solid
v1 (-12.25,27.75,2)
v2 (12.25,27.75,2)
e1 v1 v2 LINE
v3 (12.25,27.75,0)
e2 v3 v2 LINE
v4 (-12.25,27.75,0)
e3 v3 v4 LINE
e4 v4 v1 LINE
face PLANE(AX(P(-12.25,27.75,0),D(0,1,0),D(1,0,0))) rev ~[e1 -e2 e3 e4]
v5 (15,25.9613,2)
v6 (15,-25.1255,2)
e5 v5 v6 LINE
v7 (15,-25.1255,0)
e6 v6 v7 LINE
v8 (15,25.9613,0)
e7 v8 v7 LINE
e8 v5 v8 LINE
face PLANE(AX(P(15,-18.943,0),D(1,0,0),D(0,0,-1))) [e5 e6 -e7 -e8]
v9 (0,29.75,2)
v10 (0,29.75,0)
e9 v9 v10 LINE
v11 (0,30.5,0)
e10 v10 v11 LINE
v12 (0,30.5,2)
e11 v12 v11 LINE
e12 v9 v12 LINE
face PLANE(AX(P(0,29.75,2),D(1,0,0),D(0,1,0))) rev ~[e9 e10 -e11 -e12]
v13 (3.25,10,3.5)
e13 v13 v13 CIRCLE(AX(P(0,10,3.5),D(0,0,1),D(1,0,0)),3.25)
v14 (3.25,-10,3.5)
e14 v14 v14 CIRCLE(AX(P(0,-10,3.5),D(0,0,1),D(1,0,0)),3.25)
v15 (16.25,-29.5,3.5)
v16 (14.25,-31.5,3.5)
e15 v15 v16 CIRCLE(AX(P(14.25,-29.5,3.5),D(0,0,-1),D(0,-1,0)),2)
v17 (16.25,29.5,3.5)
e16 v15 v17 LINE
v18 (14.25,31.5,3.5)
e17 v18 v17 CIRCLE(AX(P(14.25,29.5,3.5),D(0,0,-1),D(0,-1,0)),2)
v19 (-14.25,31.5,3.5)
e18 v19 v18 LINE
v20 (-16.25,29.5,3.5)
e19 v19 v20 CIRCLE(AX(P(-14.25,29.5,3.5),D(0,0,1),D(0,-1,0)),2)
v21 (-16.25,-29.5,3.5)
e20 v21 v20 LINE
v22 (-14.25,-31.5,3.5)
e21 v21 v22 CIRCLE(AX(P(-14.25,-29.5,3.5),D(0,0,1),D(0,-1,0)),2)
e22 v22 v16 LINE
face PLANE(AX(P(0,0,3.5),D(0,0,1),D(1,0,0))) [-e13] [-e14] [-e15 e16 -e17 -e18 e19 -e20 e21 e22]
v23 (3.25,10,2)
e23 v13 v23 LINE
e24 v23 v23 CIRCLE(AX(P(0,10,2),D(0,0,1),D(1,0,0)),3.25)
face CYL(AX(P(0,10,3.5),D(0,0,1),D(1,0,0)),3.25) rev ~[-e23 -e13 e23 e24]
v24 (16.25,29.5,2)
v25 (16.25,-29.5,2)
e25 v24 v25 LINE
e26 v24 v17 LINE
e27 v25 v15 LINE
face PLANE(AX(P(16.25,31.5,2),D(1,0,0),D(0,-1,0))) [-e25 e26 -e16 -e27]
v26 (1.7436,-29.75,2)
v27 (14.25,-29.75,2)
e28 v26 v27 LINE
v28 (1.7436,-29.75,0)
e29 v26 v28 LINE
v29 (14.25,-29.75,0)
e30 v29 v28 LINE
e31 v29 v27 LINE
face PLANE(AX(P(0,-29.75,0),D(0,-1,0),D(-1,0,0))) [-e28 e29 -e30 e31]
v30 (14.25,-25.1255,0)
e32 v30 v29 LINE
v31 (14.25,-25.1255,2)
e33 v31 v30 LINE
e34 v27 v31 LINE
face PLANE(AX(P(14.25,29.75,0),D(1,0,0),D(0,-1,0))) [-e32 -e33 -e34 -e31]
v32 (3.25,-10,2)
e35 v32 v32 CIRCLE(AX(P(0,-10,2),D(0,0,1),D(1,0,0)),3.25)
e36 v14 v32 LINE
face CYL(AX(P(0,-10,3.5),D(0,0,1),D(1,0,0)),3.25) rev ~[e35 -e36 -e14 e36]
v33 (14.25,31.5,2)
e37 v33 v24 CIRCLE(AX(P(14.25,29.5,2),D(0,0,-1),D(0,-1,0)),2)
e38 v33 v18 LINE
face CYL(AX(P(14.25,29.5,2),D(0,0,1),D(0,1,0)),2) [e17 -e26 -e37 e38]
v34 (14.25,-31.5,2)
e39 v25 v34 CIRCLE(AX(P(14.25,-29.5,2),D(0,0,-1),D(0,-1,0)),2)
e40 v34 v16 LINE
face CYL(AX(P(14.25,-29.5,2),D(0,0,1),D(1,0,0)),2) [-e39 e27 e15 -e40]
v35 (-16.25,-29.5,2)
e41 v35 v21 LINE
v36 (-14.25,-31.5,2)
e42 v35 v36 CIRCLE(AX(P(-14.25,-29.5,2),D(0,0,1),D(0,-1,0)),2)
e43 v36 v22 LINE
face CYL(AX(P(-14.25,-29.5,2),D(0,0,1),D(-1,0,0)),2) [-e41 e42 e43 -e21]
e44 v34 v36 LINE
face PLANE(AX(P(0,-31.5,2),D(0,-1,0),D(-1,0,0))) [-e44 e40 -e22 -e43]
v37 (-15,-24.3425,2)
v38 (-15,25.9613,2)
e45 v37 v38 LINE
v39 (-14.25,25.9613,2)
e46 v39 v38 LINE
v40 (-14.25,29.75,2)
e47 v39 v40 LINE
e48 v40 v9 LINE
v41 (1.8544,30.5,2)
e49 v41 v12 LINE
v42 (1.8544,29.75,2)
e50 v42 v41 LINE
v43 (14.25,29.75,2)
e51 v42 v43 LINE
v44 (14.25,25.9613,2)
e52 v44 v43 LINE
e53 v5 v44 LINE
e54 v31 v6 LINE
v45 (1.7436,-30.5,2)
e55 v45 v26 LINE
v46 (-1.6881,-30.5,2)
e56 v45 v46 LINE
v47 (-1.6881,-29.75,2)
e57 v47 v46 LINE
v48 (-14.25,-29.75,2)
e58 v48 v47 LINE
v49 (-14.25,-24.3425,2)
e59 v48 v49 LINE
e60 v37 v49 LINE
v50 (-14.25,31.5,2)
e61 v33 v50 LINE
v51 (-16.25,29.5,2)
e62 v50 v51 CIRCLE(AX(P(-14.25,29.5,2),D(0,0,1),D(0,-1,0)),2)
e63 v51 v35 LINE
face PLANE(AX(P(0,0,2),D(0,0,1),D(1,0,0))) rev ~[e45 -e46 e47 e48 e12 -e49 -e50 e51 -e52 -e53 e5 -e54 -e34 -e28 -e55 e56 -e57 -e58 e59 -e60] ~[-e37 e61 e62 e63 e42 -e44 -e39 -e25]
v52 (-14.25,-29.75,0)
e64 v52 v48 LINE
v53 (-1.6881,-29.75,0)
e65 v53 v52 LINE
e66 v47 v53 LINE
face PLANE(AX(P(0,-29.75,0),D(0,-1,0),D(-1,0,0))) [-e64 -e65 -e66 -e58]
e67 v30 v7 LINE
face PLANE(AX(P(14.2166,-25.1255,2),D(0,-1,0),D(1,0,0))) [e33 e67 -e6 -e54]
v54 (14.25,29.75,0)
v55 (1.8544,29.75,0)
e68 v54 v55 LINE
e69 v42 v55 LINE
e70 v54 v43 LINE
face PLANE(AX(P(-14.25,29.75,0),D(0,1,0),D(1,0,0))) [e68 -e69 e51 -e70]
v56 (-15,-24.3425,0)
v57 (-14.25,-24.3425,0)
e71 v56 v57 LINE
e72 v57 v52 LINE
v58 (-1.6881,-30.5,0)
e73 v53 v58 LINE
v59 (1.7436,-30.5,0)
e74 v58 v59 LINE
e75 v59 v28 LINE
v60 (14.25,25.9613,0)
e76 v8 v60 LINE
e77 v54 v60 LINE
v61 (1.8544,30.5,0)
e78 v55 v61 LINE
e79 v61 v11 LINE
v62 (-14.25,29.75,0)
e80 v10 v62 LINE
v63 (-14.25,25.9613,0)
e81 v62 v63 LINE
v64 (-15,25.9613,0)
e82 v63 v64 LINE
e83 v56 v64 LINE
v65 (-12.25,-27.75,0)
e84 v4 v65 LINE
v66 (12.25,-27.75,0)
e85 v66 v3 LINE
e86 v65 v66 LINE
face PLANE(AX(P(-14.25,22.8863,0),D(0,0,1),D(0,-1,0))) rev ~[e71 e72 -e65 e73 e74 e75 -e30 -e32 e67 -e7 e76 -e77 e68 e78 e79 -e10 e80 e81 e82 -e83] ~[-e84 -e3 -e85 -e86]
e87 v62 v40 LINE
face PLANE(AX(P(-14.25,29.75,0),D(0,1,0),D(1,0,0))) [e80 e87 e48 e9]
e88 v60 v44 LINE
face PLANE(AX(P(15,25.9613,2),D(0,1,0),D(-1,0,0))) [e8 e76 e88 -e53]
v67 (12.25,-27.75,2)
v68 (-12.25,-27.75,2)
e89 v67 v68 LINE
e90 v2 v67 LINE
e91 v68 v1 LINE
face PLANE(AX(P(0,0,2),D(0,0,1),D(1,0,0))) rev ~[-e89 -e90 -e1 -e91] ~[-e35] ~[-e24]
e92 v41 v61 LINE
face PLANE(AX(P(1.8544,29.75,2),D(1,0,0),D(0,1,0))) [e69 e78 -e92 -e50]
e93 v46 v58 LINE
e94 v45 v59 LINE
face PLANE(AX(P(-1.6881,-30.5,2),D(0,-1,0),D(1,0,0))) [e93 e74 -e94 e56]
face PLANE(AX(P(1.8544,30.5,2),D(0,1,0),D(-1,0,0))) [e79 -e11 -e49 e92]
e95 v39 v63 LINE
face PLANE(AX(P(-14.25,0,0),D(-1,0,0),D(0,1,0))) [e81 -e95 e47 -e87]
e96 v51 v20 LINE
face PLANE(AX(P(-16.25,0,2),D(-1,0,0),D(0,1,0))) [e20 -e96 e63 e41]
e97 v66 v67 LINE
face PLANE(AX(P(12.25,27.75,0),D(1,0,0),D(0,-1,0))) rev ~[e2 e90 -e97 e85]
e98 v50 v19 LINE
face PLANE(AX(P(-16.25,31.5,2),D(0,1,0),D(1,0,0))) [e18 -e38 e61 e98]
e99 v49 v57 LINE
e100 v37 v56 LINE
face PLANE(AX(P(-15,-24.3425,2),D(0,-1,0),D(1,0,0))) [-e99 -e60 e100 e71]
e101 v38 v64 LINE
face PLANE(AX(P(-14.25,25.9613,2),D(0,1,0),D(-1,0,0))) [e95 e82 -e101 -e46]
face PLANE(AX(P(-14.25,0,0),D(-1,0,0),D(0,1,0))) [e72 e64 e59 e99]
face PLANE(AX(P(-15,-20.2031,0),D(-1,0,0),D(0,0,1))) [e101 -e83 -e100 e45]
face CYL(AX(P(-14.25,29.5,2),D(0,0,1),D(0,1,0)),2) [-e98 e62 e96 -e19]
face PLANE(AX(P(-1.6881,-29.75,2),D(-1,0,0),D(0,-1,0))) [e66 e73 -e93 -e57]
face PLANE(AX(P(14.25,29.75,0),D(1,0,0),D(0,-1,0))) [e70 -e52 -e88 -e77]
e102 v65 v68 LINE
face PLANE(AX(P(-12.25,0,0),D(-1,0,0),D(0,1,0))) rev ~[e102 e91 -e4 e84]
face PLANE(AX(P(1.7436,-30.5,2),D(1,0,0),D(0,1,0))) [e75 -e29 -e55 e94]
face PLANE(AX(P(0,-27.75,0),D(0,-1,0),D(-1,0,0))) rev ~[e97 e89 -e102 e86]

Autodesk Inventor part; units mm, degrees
ref_plane "YZ Plane" through (0, 0, 0) normal (1, 0, 0) x (0, 1, 0)
ref_plane "XZ Plane" through (0, 0, 0) normal (0, 1, 0) x (-1, 0, 0)
ref_plane "XY Plane" through (0, 0, 0) normal (0, 0, 1) x (1, 0, 0)
sketch "Эскиз1" plane through (0, 0, 0) normal (0, 0, 1) x (1, 0, 0)
  line L0 (-14.25, 29.75) -> (14.25, 29.75)
  line L1 (14.25, 29.75) -> (14.25, -29.75)
  line L2 (14.25, -29.75) -> (-14.25, -29.75)
  line L3 (-14.25, -29.75) -> (-14.25, 29.75)
  line L4 (0, -41.65) -> (0, 41.65) projected
  line L5 (-19.95, 0) -> (19.95, 0) projected
  line L6 (-12.25, 27.75) -> (12.25, 27.75)
  line L7 (12.25, 27.75) -> (12.25, -27.75)
  line L8 (12.25, -27.75) -> (-12.25, -27.75)
  line L9 (-12.25, -27.75) -> (-12.25, 27.75)
  point P0 (0, 0)
  dimension "d0" = 28.5
  dimension "d1" = 59.5
  dimension "d2" = 2
extrude "Выдавливание1" add sketch "Эскиз1" along normal blind 2 contours L0 L4 L6 L9 L5 L3 | L0 L1 L5 L7 L6 L4 | L5 L9 L8 L4 L2 L3 | L1 L2 L4 L8 L7 L5
sketch "Эскиз2" plane through (0, 0, 2) normal (0, 0, 1) x (1, 0, 0)
  line L0 (-16.25, 31.5) -> (16.25, 31.5)
  line L1 (16.25, 31.5) -> (16.25, -31.5)
  line L2 (16.25, -31.5) -> (-16.25, -31.5)
  line L3 (-16.25, -31.5) -> (-16.25, 31.5)
  line L4 (0, -44.1) -> (0, 44.1) projected
  line L5 (-22.75, 0) -> (22.75, 0) projected
  point P0 (0, 0)
  dimension "d5" = 63
  dimension "d6" = 32.5
extrude "Выдавливание2" add sketch "Эскиз2" along normal blind 1.5
sketch "Эскиз3" plane through (0, 0, 2) normal (0, 0, -1) x (-1, 0, 0)
  line L0 (15, -30.5) -> (-15, -30.5)
  line L1 (-15, -30.5) -> (-15, 30.5)
  line L2 (-15, 30.5) -> (15, 30.5)
  line L3 (15, 30.5) -> (15, -30.5)
  line L4 (0, -44.1) -> (0, 44.1) projected
  line L5 (22.75, 0) -> (-22.75, 0) projected
  line L6 (14.25, -29.75) -> (-14.25, -29.75) projected
  line L7 (1.6881, -30.5) -> (-1.7436, -30.5)
  line L8 (-1.7436, -30.5) -> (-1.7436, -29.75)
  line L9 (-1.7436, -29.75) -> (1.6881, -29.75)
  line L10 (1.6881, -29.75) -> (1.6881, -30.5)
  line L11 (1.6881, 29.75) -> (-1.8544, 29.75)
  line L12 (-1.8544, 29.75) -> (-1.8544, 30.5)
  line L13 (-1.8544, 30.5) -> (1.6881, 30.5)
  line L14 (1.6881, 30.5) -> (1.6881, 29.75)
  line L15 (14.25, 29.75) -> (14.25, -29.75) projected
  line L16 (15, 22.8864) -> (14.25, 22.8864)
  line L17 (14.25, 22.8864) -> (14.25, 25.9613)
  line L18 (14.25, 25.9613) -> (15, 25.9613)
  line L19 (15, 25.9613) -> (15, 22.8864)
  line L20 (15, -24.3425) -> (14.25, -24.3425)
  line L21 (14.25, -24.3425) -> (14.25, -20.2031)
  line L22 (14.25, -20.2031) -> (15, -20.2031)
  line L23 (15, -20.2031) -> (15, -24.3425)
  line L24 (-14.2166, -25.1255) -> (-15, -25.1255)
  line L25 (-15, -25.1255) -> (-15, -18.943)
  line L26 (-15, -18.943) -> (-14.2166, -18.943)
  line L27 (-14.2166, -18.943) -> (-14.2166, -25.1255)
  line L28 (-14.2166, 21.6162) -> (-15, 21.6162)
  line L29 (-15, 21.6162) -> (-15, 25.9613)
  line L30 (-15, 25.9613) -> (-14.2166, 25.9613)
  line L31 (-14.2166, 25.9613) -> (-14.2166, 21.6162)
  point P0 (0, 0)
  point P1 (0, 29.75)
  point P2 (0, 30.5)
  point P3 (1.6881, -29.75)
  dimension "d9" = 61
  dimension "d10" = 30
extrude "Выдавливание3" add sketch "Эскиз3" along normal blind 2 contours L0 L4 L6 L10 | L20 L15 L22 L3 | L0 L8 L6 L4 | L16 L15 L18 L3 | L1 L26 L27 L24 | L11 L12 L2 L4 | L1 L30 L31 L28
sketch "Эскиз4" plane through (0, 0, 3.5) normal (0, 0, 1) x (1, 0, 0)
  circle A0 centre (0, -10) radius 3.25
  circle A1 centre (0, 10) radius 3.25
  line L0 (-22.75, 0) -> (22.75, 0) projected
  point P0 (0, 0)
  dimension "d13" = 6.5
  dimension "d14" = 6.5
  dimension "d15" = 20
extrude "Выдавливание4" cut sketch "Эскиз4" against normal blind 2
fillet "Сопряжение1" radius 2 4 edges at (-16.25, 31.5, 2.75) (16.25, 31.5, 2.75) (16.25, -31.5, 2.75) (-16.25, -31.5, 2.75)
sketch "Эскиз6" plane through (14.25, -18.943, 0) normal (1, 0, 0) x (0, 0, -1)
  line L0 (0, 40.5592) -> (-2, 40.5592) projected
  line L1 (-2, 0) -> (-2, 40.5592) projected
  line L2 (-2, 0) -> (0, 0) projected
  line L3 (0, 0) -> (0, 40.5592) projected
  point P0 (0, 18.943)
extrude "Выдавливание6" add sketch "Эскиз6" along normal up to surface (0.75 mm away)
sketch "Эскиз7" plane through (-14.25, -20.2031, 0) normal (-1, 0, 0) x (0, 0, 1)
  line L0 (0, 0) -> (2, 0) projected
  line L1 (2, 43.0894) -> (2, 0) projected
  line L2 (2, 43.0894) -> (0, 43.0894) projected
  line L3 (0, 43.0894) -> (0, 0) projected
  point P0 (0, 20.2031)
extrude "Выдавливание7" add sketch "Эскиз7" along normal up to surface (0.75 mm away)
properties part number "нижняя часть блока аккумов"
